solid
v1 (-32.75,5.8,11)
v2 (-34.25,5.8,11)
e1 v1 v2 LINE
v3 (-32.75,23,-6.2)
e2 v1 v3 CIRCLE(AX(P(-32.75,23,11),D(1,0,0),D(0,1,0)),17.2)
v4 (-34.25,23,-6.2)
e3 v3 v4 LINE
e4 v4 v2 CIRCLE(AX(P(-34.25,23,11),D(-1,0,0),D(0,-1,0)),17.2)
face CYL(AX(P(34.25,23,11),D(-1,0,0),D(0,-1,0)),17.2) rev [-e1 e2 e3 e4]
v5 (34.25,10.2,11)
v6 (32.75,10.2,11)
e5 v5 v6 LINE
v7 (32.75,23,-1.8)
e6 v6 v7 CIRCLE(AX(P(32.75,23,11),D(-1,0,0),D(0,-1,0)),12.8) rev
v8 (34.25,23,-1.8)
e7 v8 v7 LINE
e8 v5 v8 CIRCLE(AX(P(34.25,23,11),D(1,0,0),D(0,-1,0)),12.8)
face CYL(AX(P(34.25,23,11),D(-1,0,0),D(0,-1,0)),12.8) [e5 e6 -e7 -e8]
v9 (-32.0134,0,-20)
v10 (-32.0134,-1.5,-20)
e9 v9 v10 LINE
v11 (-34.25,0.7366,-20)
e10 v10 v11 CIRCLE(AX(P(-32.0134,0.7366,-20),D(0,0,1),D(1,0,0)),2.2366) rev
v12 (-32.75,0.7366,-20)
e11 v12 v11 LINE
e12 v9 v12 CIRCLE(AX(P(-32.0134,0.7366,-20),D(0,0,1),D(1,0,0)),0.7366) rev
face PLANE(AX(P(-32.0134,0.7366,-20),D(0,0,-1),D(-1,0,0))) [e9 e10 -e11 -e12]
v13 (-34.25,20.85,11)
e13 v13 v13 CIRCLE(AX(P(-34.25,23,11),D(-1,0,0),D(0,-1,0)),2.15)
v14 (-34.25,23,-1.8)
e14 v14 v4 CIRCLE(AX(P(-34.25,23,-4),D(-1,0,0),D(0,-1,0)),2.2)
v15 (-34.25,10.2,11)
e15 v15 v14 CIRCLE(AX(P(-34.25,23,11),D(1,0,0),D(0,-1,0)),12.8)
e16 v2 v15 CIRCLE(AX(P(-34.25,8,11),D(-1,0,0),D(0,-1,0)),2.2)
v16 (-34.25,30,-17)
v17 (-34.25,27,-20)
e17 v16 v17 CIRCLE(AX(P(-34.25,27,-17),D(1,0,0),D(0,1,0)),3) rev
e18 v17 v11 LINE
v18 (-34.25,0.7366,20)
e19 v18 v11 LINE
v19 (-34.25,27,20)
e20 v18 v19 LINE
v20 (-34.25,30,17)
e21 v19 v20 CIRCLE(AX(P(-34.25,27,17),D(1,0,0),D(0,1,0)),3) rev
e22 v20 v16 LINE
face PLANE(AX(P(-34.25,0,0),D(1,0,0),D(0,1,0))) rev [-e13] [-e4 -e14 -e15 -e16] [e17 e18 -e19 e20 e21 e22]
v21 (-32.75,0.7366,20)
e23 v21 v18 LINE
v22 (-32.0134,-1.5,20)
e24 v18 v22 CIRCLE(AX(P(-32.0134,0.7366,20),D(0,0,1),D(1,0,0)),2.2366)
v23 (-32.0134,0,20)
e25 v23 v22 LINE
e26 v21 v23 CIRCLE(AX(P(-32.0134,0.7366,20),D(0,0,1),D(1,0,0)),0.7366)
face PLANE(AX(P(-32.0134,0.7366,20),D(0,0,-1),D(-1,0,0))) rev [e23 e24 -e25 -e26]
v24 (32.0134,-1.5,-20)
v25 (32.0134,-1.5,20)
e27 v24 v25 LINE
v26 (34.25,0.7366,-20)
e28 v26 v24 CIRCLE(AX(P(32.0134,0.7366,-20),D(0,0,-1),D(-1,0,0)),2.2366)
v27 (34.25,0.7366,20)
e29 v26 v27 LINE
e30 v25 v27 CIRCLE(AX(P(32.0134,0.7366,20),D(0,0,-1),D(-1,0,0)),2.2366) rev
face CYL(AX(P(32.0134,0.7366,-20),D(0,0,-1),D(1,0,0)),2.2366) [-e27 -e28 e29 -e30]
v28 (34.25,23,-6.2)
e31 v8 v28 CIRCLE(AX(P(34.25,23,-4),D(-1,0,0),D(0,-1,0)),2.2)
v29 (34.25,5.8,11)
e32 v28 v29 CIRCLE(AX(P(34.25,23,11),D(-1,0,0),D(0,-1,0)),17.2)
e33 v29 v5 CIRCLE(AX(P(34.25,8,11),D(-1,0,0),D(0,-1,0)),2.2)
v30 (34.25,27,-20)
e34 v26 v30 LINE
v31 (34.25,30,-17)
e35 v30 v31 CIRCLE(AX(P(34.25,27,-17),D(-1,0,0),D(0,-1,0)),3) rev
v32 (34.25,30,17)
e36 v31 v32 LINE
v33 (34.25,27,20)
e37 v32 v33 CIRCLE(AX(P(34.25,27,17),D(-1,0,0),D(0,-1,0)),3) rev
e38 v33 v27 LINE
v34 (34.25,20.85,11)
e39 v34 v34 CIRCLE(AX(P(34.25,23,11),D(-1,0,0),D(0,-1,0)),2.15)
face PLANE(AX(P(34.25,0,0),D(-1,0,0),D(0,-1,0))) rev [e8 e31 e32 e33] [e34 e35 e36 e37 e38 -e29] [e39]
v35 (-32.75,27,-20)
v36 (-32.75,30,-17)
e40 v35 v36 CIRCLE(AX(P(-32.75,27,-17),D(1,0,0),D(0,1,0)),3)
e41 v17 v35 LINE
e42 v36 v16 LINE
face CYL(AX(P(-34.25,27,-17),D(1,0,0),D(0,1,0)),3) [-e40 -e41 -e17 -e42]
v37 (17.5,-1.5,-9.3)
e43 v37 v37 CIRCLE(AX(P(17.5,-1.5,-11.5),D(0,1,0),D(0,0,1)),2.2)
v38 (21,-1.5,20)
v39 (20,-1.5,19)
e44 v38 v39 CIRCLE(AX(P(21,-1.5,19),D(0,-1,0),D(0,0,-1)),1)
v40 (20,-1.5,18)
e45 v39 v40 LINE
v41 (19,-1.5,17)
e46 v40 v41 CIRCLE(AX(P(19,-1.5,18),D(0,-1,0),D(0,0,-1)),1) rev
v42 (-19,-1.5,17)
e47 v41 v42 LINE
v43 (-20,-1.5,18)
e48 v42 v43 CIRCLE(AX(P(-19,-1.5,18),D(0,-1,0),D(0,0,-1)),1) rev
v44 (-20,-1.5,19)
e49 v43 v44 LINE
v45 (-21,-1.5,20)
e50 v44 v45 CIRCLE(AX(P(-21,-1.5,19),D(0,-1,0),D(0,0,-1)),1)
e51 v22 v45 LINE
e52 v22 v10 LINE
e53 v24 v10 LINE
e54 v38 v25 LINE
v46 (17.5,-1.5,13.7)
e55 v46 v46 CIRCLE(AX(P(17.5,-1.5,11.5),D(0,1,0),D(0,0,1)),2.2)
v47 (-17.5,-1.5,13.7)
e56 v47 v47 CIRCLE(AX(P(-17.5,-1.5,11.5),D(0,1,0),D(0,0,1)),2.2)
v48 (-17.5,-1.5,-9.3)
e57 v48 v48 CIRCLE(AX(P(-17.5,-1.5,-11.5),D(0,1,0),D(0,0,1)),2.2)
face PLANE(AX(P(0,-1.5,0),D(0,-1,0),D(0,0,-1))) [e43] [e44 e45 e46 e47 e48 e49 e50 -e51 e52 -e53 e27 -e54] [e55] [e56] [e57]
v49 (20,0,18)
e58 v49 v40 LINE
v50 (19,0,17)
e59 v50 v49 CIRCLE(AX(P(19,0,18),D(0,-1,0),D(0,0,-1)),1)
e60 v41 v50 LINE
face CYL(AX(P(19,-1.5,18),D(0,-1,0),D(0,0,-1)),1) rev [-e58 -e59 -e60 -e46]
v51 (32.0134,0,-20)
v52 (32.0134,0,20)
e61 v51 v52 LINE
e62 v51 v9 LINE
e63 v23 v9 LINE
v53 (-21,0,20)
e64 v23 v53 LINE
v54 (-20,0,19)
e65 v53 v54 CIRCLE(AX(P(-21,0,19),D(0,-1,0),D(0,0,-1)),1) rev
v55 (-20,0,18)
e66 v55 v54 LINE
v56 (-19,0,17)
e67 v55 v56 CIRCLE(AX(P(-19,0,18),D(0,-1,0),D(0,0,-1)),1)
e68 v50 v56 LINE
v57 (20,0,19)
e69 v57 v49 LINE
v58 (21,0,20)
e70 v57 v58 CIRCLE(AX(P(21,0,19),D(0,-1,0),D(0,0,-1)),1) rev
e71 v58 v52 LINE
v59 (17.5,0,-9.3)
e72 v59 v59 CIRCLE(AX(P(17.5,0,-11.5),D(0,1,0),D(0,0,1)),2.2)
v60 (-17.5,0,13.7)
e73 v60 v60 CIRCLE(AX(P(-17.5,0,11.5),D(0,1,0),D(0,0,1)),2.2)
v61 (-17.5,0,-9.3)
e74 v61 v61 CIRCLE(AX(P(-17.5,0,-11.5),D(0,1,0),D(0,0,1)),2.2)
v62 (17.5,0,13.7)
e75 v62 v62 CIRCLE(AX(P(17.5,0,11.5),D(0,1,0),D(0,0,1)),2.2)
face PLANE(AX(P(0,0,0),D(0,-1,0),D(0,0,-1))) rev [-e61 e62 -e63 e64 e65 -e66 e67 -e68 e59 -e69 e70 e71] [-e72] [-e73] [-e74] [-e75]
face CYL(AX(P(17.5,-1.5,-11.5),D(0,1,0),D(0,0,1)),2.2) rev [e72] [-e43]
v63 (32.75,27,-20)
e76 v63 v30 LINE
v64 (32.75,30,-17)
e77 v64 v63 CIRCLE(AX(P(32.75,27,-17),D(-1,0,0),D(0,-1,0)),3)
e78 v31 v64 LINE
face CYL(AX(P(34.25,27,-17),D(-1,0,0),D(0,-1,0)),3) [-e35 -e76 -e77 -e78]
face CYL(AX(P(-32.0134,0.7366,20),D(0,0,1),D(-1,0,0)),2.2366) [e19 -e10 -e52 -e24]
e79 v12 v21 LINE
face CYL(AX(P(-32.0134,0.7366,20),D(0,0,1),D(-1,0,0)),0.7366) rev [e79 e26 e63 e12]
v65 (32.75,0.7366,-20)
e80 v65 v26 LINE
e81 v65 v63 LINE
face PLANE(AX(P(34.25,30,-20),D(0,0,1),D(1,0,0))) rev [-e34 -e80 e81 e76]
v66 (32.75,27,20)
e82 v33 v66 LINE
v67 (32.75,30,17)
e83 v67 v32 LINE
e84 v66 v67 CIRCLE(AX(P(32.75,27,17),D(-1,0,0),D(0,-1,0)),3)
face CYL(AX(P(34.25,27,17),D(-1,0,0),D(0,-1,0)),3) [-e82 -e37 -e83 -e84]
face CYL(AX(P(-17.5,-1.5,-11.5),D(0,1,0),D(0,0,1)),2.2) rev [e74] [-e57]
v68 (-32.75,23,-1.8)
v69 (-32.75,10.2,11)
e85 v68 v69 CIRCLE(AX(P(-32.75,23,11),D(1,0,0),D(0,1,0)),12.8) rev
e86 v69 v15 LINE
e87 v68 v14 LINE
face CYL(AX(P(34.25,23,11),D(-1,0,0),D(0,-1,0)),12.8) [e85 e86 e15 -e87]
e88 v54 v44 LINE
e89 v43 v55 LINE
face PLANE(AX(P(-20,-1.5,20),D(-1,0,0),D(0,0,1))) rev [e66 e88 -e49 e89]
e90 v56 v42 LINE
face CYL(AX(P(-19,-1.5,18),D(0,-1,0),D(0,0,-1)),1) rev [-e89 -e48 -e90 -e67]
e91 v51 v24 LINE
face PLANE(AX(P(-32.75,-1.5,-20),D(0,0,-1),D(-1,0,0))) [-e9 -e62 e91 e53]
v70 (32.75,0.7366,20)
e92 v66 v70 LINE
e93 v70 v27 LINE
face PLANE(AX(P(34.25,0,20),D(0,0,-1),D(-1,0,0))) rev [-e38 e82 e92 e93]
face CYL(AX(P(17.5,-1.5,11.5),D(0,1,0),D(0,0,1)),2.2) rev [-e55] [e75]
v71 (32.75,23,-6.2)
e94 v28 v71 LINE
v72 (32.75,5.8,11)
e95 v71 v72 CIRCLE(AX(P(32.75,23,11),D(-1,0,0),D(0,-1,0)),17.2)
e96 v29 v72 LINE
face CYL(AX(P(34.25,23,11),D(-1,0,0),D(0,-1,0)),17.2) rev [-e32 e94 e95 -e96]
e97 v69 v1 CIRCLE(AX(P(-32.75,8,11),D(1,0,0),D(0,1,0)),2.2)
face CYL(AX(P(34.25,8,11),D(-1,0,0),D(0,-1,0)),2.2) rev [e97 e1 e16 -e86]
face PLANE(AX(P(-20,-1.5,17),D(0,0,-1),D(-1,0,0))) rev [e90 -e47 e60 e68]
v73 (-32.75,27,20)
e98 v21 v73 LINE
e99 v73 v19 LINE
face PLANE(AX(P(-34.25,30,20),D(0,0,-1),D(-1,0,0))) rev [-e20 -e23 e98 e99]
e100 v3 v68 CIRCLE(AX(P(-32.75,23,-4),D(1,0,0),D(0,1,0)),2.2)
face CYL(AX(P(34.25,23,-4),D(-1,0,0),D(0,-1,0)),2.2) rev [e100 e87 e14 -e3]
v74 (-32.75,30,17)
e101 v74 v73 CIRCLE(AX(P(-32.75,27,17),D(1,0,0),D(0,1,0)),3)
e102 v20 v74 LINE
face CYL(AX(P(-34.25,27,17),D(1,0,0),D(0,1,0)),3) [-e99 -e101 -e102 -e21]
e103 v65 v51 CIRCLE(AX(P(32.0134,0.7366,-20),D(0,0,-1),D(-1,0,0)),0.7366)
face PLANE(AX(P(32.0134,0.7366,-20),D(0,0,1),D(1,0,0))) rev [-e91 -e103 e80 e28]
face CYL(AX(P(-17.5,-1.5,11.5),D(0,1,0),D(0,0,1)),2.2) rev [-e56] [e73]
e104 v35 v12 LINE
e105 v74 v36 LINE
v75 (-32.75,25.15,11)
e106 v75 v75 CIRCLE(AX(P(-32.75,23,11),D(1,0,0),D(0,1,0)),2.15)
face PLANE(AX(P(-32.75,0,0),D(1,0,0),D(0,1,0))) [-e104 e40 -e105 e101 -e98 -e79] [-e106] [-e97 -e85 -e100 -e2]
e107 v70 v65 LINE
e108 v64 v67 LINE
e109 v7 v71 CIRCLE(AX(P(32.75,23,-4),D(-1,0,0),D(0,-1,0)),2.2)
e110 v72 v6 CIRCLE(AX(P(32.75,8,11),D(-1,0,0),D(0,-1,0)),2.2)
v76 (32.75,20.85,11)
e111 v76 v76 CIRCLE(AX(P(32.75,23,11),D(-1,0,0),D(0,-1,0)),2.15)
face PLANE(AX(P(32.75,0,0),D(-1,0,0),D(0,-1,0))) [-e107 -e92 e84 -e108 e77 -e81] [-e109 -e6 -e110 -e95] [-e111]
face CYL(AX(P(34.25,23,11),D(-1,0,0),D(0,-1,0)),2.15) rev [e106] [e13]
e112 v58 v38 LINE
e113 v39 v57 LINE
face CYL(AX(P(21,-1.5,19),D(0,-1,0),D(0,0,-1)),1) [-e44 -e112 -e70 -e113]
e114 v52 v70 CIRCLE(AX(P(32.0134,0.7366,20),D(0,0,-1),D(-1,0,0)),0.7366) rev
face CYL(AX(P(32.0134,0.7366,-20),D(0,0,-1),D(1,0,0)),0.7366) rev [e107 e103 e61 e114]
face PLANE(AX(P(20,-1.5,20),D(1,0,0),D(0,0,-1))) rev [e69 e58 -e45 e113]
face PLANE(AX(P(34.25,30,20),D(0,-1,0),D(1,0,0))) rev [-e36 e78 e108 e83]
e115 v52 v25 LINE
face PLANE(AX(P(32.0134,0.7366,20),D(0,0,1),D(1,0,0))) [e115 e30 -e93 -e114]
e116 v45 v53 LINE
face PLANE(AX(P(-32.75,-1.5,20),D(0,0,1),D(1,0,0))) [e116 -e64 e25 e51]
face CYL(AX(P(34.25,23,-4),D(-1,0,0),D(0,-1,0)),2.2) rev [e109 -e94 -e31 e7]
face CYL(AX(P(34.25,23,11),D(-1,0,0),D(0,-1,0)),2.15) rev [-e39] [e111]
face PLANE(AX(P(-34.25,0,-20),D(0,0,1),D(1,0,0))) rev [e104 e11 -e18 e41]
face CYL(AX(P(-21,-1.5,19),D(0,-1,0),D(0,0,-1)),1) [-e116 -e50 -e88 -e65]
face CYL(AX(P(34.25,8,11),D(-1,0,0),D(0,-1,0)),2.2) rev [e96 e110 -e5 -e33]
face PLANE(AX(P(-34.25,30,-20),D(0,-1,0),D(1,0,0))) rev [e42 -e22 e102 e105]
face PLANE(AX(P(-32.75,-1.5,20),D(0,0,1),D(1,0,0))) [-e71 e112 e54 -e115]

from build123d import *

# Parameters (mm, degrees)
SKETCH_1_W                         = 65.5
SKETCH_1_H                         = 40
SKETCH_1_R                         = 2.2
SM_BASE_FLANGE_1_DEPTH             = 1.5
SM_EDGE_FLANGE_1_STRIP_W           = 7.4732
SM_EDGE_FLANGE_1_STRIP_H           = 1.5
SM_EDGE_FLANGE_1_STRIP_CUT_DEPTH   = 40
SM_EDGE_FLANGE_1_STRIP_2_W         = 7.4732
SM_EDGE_FLANGE_1_STRIP_2_H         = 1.5
SM_EDGE_FLANGE_1_STRIP_CUT_2_DEPTH = 40
SM_EDGE_FLANGE_1_DEPTH             = 40
SM_EDGE_FLANGE_1_BEND_DEPTH        = 40
SKETCH_12_R                        = 2.15
CUT_EXTRUDE_1_DEPTH                = 78.409624725
SKETCH_13_W                        = 40
SKETCH_13_H                        = 3
CUT_EXTRUDE_2_DEPTH                = 50.729895435
FILLET_1_R                         = 1
FILLET_2_R                         = 3


# Sheet-metal steps are written as plain solids
with BuildPart() as part:
    # Sketch 1 → 基体-法兰1 (new body)
    with BuildSketch(Plane(origin=(0, 0, 0), x_dir=(1, 0, 0), z_dir=(0, 1, 0))):
        Rectangle(SKETCH_1_W, SKETCH_1_H)
        with Locations(Location((-17.5, 11.5, 0), (0, 0, 270))):
            Circle(SKETCH_1_R, mode=Mode.SUBTRACT)
        with Locations(Location((17.5, 11.5, 0), (0, 0, 270))):
            Circle(SKETCH_1_R, mode=Mode.SUBTRACT)
        with Locations(Location((17.5, -11.5, 0), (0, 0, 270))):
            Circle(SKETCH_1_R, mode=Mode.SUBTRACT)
        with Locations(Location((-17.5, -11.5, 0), (0, 0, 270))):
            Circle(SKETCH_1_R, mode=Mode.SUBTRACT)
    extrude(amount=-SM_BASE_FLANGE_1_DEPTH)

    # 边线-法兰1 strip (across the edge) → 边线-法兰1 strip cut (cut)
    with BuildSketch(Plane(origin=(-32.75, 0, -20), x_dir=(1, 0, 0), z_dir=(0, 0, 1))):
        with Locations((-3, -0.75)):
            Rectangle(SM_EDGE_FLANGE_1_STRIP_W, SM_EDGE_FLANGE_1_STRIP_H)
    extrude(amount=SM_EDGE_FLANGE_1_STRIP_CUT_DEPTH, mode=Mode.SUBTRACT)

    # 边线-法兰1 strip 2 (across the edge) → 边线-法兰1 strip cut 2 (cut)
    with BuildSketch(Plane(origin=(32.75, 0, 20), x_dir=(-1, 0, 0), z_dir=(0, 0, -1))):
        with Locations((-3, -0.75)):
            Rectangle(SM_EDGE_FLANGE_1_STRIP_2_W, SM_EDGE_FLANGE_1_STRIP_2_H)
    extrude(amount=SM_EDGE_FLANGE_1_STRIP_CUT_2_DEPTH, mode=Mode.SUBTRACT)

    # 边线-法兰1 section (across the edge) → 边线-法兰1 (add)
    with BuildSketch(Plane(origin=(-32.75, 0, -20), x_dir=(1, 0, 0), z_dir=(0, 0, 1))):
        with BuildLine():
            Line((-1.5, 0.7366), (-1.5, 30))
            Line((-1.5, 30), (0, 30))
            Line((0, 30), (0, 0.7366))
            ThreePointArc((0, 0.7366), (0.215745145, 0.215745145), (0.7366, 0))
            Line((0.7366, 0), (0.7366, -1.5))
            ThreePointArc((0.7366, -1.5), (-0.844915027, -0.844915027), (-1.5, 0.7366))
        make_face()
    extrude(amount=SM_EDGE_FLANGE_1_DEPTH)

    # 边线-法兰1 section 2 (across the edge) → 边线-法兰1 bend (add)
    with BuildSketch(Plane(origin=(32.75, 0, 20), x_dir=(-1, 0, 0), z_dir=(0, 0, -1))):
        with BuildLine():
            Line((-1.5, 0.7366), (-1.5, 30))
            Line((-1.5, 30), (0, 30))
            Line((0, 30), (0, 0.7366))
            ThreePointArc((0, 0.7366), (0.215745145, 0.215745145), (0.7366, 0))
            Line((0.7366, 0), (0.7366, -1.5))
            ThreePointArc((0.7366, -1.5), (-0.844915027, -0.844915027), (-1.5, 0.7366))
        make_face()
    extrude(amount=SM_EDGE_FLANGE_1_BEND_DEPTH)

    # 草图12 → 切除-拉伸1 (cut, through all)
    with BuildSketch(Plane.ZY.offset(34.25)):
        with Locations(Location((11, 23, 0), (0, 0, 270))):
            Circle(SKETCH_12_R)
        with BuildLine():
            ThreePointArc((-6.2, 23), (-1.162236636, 10.837763364), (11, 5.8))
            ThreePointArc((11, 5.8), (13.2, 8), (11, 10.2))
            ThreePointArc((11, 10.2), (1.949033201, 13.949033201), (-1.8, 23))
            ThreePointArc((-1.8, 23), (-4, 25.2), (-6.2, 23))
        make_face()
    extrude(amount=-CUT_EXTRUDE_1_DEPTH, mode=Mode.SUBTRACT)

    # 草图13 → 切除-拉伸2 (cut, through all)
    with BuildSketch(Plane(origin=(0, 0, 0), x_dir=(1, 0, 0), z_dir=(0, 1, 0))):
        with Locations((0, -18.5)):
            Rectangle(SKETCH_13_W, SKETCH_13_H)
    extrude(amount=-CUT_EXTRUDE_2_DEPTH, mode=Mode.SUBTRACT)

    # 圆角1
    fillet_1_edges = [part.edges().sort_by_distance(p)[0] for p in [
        (-20, -0.75, 20),
        (-20, -0.75, 17),
        (20, -0.75, 17),
        (20, -0.75, 20),
    ]]
    fillet(fillet_1_edges, radius=FILLET_1_R)

    # 圆角2
    fillet_2_edges = [part.edges().sort_by_distance(p)[0] for p in [
        (-33.5, 30, -20),
        (-33.5, 30, 20),
        (33.5, 30, 20),
        (33.5, 30, -20),
    ]]
    fillet(fillet_2_edges, radius=FILLET_2_R)


solid = part.part
